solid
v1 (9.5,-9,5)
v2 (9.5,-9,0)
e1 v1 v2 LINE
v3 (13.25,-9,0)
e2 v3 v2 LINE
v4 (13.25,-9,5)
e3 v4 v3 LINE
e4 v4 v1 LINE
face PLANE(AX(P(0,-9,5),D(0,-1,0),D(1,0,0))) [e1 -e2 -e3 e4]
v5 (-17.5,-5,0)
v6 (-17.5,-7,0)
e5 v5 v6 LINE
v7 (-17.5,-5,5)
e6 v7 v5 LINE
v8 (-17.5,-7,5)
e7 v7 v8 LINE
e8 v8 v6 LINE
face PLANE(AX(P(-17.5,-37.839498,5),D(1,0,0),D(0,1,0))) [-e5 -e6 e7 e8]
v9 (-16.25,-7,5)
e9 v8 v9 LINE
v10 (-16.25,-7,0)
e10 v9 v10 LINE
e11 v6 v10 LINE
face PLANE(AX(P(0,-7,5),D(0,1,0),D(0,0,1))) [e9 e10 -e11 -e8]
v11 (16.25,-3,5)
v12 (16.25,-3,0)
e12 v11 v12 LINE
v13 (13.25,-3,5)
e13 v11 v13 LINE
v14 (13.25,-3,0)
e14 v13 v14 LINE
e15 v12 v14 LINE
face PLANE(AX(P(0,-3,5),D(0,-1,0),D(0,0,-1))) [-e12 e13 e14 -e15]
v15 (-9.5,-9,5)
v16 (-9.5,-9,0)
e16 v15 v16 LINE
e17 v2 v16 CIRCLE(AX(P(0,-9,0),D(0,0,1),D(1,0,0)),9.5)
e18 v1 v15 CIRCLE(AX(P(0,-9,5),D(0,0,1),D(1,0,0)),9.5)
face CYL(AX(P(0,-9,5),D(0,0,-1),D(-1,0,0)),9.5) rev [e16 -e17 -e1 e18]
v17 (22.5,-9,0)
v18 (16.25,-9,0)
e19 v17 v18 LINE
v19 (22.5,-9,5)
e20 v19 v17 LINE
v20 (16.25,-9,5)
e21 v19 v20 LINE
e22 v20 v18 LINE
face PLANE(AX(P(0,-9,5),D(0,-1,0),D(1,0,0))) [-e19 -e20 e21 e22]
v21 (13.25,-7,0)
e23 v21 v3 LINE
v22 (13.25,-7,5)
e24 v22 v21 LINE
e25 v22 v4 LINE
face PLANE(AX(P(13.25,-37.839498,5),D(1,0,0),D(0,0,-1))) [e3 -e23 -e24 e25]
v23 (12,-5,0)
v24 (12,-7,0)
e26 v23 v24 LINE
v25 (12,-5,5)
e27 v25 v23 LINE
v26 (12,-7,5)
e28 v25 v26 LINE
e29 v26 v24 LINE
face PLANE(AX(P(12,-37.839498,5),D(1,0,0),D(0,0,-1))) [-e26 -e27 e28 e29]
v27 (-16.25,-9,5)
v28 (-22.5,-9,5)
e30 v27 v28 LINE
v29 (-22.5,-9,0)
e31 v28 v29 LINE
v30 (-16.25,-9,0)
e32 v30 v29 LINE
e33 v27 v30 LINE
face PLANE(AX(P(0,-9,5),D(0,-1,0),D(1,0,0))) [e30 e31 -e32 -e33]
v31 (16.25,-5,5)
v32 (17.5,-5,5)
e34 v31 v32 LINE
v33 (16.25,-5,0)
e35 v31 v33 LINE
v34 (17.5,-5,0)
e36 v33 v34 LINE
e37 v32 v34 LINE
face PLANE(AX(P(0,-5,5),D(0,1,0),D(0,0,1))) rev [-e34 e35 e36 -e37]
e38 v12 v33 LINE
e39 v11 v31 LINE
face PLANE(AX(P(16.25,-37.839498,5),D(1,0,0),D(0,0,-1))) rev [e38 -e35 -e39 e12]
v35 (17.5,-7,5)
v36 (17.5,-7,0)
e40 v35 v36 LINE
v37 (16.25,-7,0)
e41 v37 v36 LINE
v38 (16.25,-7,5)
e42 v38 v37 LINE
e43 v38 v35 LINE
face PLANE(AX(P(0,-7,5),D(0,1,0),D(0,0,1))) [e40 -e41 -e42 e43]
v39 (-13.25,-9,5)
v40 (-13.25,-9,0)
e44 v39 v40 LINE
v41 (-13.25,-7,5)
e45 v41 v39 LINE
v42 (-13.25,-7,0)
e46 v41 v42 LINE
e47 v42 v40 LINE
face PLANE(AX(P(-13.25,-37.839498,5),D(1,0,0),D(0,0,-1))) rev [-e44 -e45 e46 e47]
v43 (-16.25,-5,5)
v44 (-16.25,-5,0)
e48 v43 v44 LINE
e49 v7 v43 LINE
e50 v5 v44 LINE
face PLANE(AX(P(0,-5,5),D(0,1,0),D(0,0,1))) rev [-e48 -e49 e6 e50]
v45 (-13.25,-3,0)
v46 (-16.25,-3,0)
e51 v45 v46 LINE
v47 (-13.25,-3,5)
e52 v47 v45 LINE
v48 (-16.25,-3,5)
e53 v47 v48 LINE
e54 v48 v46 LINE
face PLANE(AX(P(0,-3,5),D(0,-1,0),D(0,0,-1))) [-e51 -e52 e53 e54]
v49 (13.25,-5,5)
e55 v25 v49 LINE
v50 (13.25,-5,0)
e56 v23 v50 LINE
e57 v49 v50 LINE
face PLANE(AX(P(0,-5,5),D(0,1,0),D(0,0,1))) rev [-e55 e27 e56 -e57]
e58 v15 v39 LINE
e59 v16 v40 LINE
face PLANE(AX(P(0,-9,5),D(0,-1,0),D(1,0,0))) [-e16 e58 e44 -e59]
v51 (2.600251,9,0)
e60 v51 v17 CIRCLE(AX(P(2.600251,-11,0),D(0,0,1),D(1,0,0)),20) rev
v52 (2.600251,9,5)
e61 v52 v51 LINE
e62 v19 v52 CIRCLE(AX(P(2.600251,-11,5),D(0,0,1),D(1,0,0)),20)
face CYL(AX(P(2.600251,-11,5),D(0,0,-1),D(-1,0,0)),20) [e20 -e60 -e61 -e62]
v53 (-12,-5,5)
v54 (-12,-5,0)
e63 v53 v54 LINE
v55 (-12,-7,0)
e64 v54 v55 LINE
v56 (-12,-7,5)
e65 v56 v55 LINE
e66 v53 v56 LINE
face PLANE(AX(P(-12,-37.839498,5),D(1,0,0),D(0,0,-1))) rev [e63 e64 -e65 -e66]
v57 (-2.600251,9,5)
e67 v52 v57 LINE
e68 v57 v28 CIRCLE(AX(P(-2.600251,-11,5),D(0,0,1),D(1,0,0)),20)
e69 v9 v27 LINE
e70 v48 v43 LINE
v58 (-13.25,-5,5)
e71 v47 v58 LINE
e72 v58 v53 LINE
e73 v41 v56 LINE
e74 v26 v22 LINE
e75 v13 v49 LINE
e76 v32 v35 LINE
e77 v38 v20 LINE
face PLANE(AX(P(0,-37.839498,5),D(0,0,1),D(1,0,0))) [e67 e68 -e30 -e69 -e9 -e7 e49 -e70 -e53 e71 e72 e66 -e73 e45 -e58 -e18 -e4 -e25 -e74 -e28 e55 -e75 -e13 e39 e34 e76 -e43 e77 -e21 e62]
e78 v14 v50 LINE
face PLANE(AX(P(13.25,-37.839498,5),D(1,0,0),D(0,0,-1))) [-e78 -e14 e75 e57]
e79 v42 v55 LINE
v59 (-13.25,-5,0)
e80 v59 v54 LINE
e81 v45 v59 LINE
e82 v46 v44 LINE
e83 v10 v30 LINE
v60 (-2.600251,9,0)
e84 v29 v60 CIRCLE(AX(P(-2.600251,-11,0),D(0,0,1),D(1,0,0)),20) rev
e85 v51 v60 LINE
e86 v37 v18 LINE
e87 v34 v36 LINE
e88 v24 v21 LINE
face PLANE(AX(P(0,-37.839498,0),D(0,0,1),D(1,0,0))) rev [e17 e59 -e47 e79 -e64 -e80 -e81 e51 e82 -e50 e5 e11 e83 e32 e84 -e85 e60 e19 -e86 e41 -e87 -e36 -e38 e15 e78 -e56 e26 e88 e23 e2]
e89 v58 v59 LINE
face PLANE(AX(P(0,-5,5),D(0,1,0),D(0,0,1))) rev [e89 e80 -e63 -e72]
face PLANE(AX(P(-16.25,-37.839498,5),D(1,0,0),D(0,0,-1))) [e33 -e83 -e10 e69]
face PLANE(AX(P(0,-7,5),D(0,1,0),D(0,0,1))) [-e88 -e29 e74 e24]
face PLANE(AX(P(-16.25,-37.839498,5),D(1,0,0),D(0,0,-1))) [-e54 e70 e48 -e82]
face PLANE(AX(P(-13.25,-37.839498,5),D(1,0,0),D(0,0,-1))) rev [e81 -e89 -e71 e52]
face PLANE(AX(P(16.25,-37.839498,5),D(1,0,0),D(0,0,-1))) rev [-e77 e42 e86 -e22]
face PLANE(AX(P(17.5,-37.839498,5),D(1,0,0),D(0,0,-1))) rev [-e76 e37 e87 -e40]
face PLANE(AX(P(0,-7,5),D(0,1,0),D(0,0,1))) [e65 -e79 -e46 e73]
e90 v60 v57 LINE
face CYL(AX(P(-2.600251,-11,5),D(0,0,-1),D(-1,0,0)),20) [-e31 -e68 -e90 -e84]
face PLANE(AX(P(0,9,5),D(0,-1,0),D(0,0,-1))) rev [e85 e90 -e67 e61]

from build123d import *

# Parameters (mm, degrees)
BOSS_EXTRUDE1_DEPTH = 5
FILLET1_R           = 20


with BuildPart() as part:
    # Sketch1 → Boss-Extrude1 (new body)
    with BuildSketch(Plane.XY):
        with BuildLine():
            Line((13.25, -3), (16.25, -3))
            Line((16.25, -3), (16.25, -5))
            Line((16.25, -5), (17.5, -5))
            Line((17.5, -5), (17.5, -7))
            Line((17.5, -7), (16.25, -7))
            Line((16.25, -7), (16.25, -9))
            Line((16.25, -9), (22.5, -9))
            Line((22.5, -9), (22.5, 9))
            Line((22.5, 9), (-22.5, 9))
            Line((-22.5, 9), (-22.5, -9))
            Line((-22.5, -9), (-16.25, -9))
            Line((-16.25, -9), (-16.25, -7))
            Line((-16.25, -7), (-17.5, -7))
            Line((-17.5, -7), (-17.5, -5))
            Line((-17.5, -5), (-16.25, -5))
            Line((-16.25, -5), (-16.25, -3))
            Line((-16.25, -3), (-13.25, -3))
            Line((-13.25, -3), (-13.25, -5))
            Line((-13.25, -5), (-12, -5))
            Line((-12, -5), (-12, -7))
            Line((-12, -7), (-13.25, -7))
            Line((-13.25, -7), (-13.25, -9))
            Line((-13.25, -9), (-9.5, -9))
            ThreePointArc((-9.5, -9), (0, 0.5), (9.5, -9))
            Line((9.5, -9), (13.25, -9))
            Line((13.25, -9), (13.25, -7))
            Line((13.25, -7), (12, -7))
            Line((12, -7), (12, -5))
            Line((12, -5), (13.25, -5))
            Line((13.25, -5), (13.25, -3))
        make_face()
    extrude(amount=BOSS_EXTRUDE1_DEPTH)

    # Fillet1
    # the kernel refuses this fillet: 20 mm, written as the material it takes off along each edge
    with BuildSketch(Plane(origin=(22.5, 9, -49.749371855), x_dir=(0, -1, 0), z_dir=(0, 0, 1))) as fillet1_piece_1:
        with BuildLine():
            CenterArc((20, -19.899748742), FILLET1_R, 95.739170477, 84.260829523)
            Line((0, -19.899748742), (-0.4, -19.899748742))
            Line((-0.4, -19.899748742), (-0.4, 0))
            Line((-0.4, 0), (0, 0.4))
            ThreePointArc((0, 0.4), (9, 0.4), (17.96, 0.397994975))
            Line((17.96, 0.397994975), (18, 0))
        make_face()
    extrude(amount=104.498743711, mode=Mode.SUBTRACT)
    with BuildSketch(Plane(origin=(-22.5, 9, -49.749371855), x_dir=(1, 0, 0), z_dir=(0, 0, 1))) as fillet1_piece_2:
        with BuildLine():
            CenterArc((19.899748742, -20), FILLET1_R, 90, 84.260829523)
            Line((0, -18), (-0.397994975, -17.96))
            ThreePointArc((-0.397994975, -17.96), (-0.4, -9), (-0.4, 0))
            Line((-0.4, 0), (0, 0.4))
            Line((0, 0.4), (19.899748742, 0.4))
            Line((19.899748742, 0.4), (19.899748742, 0))
        make_face()
    extrude(amount=104.498743711, mode=Mode.SUBTRACT)


solid = part.part
